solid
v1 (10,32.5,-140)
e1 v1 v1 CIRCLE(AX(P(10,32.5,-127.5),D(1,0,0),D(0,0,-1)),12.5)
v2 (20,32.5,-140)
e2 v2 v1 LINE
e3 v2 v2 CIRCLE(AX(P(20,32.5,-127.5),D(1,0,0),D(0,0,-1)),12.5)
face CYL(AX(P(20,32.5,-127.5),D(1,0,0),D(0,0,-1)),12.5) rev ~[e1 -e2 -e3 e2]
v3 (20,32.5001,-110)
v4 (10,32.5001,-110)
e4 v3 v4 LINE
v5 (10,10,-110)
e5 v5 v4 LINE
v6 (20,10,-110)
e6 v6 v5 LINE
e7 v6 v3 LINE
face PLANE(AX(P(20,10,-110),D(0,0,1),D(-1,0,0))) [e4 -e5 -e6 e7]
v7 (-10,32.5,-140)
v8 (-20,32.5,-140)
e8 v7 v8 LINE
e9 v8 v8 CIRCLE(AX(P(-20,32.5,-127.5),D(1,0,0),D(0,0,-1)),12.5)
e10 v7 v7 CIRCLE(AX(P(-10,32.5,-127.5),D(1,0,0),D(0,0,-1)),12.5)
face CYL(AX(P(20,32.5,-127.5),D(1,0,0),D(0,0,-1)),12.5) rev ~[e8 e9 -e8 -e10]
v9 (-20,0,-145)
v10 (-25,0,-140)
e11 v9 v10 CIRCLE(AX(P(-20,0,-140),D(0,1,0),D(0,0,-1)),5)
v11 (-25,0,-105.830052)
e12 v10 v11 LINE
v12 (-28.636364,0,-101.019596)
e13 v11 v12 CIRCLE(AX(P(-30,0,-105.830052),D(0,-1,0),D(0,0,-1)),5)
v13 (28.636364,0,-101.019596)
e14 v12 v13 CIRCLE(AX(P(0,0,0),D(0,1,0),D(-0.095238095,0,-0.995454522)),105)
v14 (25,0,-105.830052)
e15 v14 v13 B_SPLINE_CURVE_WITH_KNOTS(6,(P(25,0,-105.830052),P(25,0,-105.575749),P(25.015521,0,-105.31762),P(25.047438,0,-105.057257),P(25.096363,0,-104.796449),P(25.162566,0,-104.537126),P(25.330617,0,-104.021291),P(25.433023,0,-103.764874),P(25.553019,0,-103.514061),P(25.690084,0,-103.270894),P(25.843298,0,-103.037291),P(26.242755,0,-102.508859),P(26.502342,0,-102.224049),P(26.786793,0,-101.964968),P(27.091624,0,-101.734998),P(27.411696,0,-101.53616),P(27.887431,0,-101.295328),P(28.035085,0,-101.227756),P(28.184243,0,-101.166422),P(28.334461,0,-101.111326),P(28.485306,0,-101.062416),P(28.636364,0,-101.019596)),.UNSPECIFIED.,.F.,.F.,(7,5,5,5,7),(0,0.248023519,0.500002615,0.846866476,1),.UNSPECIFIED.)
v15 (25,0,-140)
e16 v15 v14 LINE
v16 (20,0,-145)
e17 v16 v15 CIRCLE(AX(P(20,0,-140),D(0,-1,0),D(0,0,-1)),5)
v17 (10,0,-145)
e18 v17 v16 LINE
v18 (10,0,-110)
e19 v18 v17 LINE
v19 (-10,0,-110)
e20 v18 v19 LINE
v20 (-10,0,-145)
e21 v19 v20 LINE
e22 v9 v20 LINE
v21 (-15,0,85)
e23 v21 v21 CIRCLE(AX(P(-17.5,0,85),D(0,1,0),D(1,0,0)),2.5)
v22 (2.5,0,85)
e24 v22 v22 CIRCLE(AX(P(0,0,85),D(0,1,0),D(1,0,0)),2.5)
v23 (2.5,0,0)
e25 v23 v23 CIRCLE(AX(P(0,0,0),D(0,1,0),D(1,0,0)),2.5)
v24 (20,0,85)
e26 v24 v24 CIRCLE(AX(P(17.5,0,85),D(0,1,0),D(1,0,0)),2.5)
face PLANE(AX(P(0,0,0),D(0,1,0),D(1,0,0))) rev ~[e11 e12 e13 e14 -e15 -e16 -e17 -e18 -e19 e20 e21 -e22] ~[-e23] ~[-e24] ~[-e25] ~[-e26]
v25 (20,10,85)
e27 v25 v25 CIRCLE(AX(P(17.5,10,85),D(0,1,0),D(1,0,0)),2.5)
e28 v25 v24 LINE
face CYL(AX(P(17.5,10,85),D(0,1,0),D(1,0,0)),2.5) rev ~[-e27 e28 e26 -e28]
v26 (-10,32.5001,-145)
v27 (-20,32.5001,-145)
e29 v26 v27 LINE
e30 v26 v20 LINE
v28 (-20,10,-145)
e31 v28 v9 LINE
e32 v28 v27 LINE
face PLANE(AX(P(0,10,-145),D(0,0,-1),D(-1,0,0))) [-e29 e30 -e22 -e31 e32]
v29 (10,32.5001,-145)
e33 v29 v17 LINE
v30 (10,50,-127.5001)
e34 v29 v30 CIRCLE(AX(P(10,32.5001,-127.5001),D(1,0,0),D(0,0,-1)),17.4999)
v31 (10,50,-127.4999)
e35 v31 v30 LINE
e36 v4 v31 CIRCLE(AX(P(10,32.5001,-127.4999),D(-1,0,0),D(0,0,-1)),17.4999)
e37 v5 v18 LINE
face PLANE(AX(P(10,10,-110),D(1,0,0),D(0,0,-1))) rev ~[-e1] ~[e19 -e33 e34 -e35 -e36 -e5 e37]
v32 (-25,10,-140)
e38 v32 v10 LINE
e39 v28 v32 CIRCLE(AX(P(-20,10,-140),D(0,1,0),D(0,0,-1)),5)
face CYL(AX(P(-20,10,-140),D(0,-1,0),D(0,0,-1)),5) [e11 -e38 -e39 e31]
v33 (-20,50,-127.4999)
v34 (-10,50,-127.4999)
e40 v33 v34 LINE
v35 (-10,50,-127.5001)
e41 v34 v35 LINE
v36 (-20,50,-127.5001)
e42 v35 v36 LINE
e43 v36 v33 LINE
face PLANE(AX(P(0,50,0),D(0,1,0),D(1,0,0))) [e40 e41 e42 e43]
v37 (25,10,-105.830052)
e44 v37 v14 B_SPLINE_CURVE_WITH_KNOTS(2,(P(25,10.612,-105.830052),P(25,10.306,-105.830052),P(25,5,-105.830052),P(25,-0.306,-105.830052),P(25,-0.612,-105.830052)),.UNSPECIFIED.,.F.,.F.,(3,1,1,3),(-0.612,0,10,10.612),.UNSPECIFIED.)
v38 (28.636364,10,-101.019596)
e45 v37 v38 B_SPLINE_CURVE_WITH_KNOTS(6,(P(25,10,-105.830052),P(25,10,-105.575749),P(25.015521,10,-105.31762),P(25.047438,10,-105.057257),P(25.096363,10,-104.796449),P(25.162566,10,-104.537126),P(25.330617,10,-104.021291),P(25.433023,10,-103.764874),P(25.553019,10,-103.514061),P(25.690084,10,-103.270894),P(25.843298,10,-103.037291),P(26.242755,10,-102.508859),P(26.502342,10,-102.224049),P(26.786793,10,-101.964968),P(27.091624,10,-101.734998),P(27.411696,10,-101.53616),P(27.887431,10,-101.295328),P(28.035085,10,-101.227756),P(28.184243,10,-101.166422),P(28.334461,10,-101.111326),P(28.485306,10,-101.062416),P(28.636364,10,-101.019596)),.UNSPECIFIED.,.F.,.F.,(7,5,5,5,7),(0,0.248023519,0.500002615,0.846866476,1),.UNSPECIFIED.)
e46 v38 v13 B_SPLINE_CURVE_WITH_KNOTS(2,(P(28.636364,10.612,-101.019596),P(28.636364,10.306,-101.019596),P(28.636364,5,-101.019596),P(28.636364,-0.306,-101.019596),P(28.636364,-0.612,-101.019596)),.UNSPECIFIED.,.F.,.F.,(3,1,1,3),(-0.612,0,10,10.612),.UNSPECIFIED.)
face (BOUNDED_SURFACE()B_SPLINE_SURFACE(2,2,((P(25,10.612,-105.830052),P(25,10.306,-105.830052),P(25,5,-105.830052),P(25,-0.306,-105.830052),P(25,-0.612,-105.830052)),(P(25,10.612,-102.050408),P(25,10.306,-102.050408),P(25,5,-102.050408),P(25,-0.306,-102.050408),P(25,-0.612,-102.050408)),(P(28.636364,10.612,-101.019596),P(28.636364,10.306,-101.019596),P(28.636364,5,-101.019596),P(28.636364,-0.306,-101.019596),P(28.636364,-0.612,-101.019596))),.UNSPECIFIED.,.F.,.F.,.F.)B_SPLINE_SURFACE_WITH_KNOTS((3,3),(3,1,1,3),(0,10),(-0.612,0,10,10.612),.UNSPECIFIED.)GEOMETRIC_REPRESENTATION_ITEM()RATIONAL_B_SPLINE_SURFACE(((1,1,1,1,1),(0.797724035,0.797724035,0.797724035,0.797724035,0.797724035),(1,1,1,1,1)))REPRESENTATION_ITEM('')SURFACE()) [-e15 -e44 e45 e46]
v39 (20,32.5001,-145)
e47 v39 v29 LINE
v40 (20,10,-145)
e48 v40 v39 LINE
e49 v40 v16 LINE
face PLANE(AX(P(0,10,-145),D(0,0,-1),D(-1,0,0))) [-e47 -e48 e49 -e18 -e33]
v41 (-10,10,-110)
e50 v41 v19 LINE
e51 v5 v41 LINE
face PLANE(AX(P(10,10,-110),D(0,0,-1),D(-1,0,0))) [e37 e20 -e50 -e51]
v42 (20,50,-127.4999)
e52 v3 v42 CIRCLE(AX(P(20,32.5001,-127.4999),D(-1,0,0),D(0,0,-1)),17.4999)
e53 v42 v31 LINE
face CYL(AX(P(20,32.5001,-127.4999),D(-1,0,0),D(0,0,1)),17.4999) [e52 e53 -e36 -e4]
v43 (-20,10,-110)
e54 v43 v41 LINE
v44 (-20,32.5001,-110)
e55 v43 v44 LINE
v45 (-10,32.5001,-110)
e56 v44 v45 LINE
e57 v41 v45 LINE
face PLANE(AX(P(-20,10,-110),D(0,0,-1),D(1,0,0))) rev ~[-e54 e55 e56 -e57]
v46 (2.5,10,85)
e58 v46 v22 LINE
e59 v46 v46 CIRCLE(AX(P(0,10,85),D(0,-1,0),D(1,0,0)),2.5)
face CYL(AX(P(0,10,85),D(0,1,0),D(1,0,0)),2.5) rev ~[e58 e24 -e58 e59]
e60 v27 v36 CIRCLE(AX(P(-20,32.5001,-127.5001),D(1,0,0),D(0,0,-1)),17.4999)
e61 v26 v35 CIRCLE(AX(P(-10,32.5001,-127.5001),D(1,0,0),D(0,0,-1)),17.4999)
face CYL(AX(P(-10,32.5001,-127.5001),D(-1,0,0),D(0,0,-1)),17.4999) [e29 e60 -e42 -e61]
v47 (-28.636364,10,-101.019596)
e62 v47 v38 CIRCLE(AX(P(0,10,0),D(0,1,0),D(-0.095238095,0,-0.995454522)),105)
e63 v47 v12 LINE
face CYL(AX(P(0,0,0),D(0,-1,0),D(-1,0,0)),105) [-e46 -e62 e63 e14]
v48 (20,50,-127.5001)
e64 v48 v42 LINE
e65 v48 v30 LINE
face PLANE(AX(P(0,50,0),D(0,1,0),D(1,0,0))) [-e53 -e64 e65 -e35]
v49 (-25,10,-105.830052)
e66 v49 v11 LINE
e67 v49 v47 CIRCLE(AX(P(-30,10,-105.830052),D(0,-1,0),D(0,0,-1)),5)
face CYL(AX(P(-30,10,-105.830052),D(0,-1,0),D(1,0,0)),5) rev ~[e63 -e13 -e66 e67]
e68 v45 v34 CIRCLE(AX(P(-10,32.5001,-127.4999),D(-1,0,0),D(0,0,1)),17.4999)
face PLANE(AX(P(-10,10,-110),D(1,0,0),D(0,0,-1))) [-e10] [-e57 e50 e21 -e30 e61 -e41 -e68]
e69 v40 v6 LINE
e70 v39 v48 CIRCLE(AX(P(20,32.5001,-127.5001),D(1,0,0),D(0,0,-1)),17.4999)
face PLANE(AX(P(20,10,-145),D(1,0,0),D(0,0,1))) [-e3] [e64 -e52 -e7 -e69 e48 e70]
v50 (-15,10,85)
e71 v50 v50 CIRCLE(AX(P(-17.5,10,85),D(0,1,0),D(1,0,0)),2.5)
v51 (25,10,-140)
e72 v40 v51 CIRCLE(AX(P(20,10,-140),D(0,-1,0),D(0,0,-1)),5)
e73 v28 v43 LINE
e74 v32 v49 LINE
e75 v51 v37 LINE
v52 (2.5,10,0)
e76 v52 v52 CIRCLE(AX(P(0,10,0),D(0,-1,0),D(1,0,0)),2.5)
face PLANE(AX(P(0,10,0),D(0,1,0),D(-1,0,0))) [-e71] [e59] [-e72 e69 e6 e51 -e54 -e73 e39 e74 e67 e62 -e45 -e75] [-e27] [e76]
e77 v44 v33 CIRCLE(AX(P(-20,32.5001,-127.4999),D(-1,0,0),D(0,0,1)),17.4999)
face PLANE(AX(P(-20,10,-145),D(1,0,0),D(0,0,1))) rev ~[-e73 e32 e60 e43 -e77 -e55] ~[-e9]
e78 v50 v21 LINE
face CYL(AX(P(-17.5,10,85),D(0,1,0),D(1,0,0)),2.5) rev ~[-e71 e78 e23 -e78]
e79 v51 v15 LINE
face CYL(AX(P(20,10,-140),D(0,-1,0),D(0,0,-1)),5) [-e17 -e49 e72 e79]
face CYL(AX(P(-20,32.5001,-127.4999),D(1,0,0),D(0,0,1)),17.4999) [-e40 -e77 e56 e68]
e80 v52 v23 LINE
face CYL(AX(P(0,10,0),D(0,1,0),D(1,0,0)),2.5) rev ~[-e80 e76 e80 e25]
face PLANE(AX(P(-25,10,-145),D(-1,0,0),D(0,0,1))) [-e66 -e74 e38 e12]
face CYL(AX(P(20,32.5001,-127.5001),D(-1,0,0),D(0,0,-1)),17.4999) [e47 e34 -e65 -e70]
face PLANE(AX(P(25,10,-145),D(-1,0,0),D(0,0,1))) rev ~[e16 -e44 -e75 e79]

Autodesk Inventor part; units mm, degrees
ref_plane "YZ Plane" through (0, 0, 0) normal (1, 0, 0) x (0, 1, 0)
ref_plane "XZ Plane" through (0, 0, 0) normal (0, 1, 0) x (-1, 0, 0)
ref_plane "XY Plane" through (0, 0, 0) normal (0, 0, 1) x (1, 0, 0)
sketch "Sketch1" plane through (0, 0, 0) normal (0, 1, 0) x (-1, 0, 0)
  circle A0 centre (0, 0) radius 105
  dimension "d0" = 210
extrude "Extrusion1" add sketch "Sketch1" along normal blind 10
sketch "Sketch2" plane through (0, 10, 0) normal (0, 1, 0) x (1, 0, 0)
  line L0 (-79.8594, -68.6516) -> (79.5179, -68.6516)
  line L1 (0, 0) -> (0, -80)
  line L2 (0, -80) -> (0, -60)
  line L3 (0, -60) -> (17.5, -60)
  line L4 (0, -60) -> (-17.5, -60)
  circle A0 centre (-17.5, -60) radius 2.5
  circle A1 centre (0, -60) radius 2.5
  circle A2 centre (17.5, -60) radius 2.5
  dimension "d4" = 80
  dimension "d5" = 20
  dimension "d6" = 17.5
  dimension "d7" = 17.5
  dimension "d8" = 5
  dimension "d9" = 5
  dimension "d10" = 5
extrude "Extrusion2" cut sketch "Sketch2" against normal blind 10
sketch "Sketch3" plane through (0, 10, 0) normal (0, 1, 0) x (1, 0, 0)
  circle A0 centre (0, 0) radius 2.5
  dimension "d13" = 5
extrude "Extrusion3" cut sketch "Sketch3" against normal blind 10
sketch "Sketch4" plane through (0, 10, 0) normal (0, 1, 0) x (1, 0, 0)
  circle A0 centre (0, 0) radius 2.5 projected
  line L0 (0, 0) -> (0, 80)
  line L1 (-15, 80) -> (-15, 65)
  line L2 (-15, 65) -> (15, 65)
  line L3 (15, 65) -> (15, 95)
  line L4 (15, 95) -> (-15, 95)
  line L5 (-15, 95) -> (-15, 80)
  line L6 (0, 80) -> (-7.5, 80)
  line L7 (-7.5, 80) -> (7.5, 80)
  line L8 (7.5, 80) -> (7.5, 95)
  line L9 (7.5, 80) -> (7.5, 65)
  line L10 (-7.5, 80) -> (-7.5, 95)
  line L11 (-7.5, 80) -> (-7.5, 65)
  dimension "d20" = 15
  dimension "d21" = 15
  dimension "d22" = 30
  dimension "d23" = 30
  dimension "d24" = 7.5
  dimension "d25" = 15
extrude "Extrusion4" add sketch "Sketch4" along normal blind 30 contours L2 L11 L6 L0 | L0 L7 L9 L2 | L6 L10 L4 L8 L7
sketch "Sketch5" plane through (7.5, 10, -65) normal (1, 0, 0) x (0, 0, -1)
  line L0 (40, 0) -> (-170, 0) projected
  line L1 (40, 0) -> (15, 0)
  line L2 (15, 0) -> (15, 15)
  circle A0 centre (15, 15) radius 7.5
  line L3 (30, 0) -> (30, 30) projected
  arc A1 (30, 15) -> (0, 15) centre (15, 15) ccw
  line L4 (15, 15) -> (0, 15) construction
  line L5 (15, 15) -> (30, 15) construction
  line L6 (0, 0) -> (0, 30) projected
  line L7 (0, 15) -> (0, 30)
  line L8 (0, 30) -> (30, 30) projected
  line L9 (0, 30) -> (30, 30)
  line L10 (30, 30) -> (30, 15)
  point P0 (-65, -10)
  point P1 (15, 30)
  dimension "d28" = 25
  dimension "d29" = 15
  dimension "d30" = 15
  dimension "d31" = 180
extrude "Extrusion5" cut sketch "Sketch5" against normal blind 30 contours A1 L8 L3 | A1 L6 L8 | A0
sketch "Sketch6" plane through (7.5, 10, -65) normal (1, 0, 0) x (0, 0, -1)
  circle A0 centre (15, 15) radius 7.5 projected
  circle A1 centre (15, 15) radius 5
  circle A2 centre (15, 15) radius 7.5
  point P0 (-65, -10)
  dimension "d34" = 10
extrude "Extrusion6" add sketch "Sketch6" against normal blind 15
sketch "Sketch7" plane through (7.5, 10, -65) normal (1, 0, 0) x (0, 0, -1)
  line L0 (0, 0) -> (30, 0) projected
  line L1 (0, 0) -> (30, 0)
  line L2 (30, 0) -> (30, 34.6991)
  line L3 (30, 34.6991) -> (0, 34.6991)
  line L4 (0, 34.6991) -> (0, 0)
  point P0 (-65, -10)
extrude "Extrusion7" cut sketch "Sketch7" against normal blind 15
sketch "Sketch8" plane through (0, 10, 0) normal (0, 1, 0) x (1, 0, 0)
  circle A0 centre (0, 0) radius 2.5 projected
  line L0 (0, 0) -> (0, 100)
  line L1 (0, 100) -> (-10, 100)
  line L2 (-10, 100) -> (-20, 100)
  line L3 (-20, 100) -> (-20, 65)
  line L4 (-20, 65) -> (-10, 65)
  line L5 (-10, 65) -> (-10, 100)
  line L6 (0, 100) -> (10, 100)
  line L7 (10, 100) -> (20, 100)
  line L8 (20, 100) -> (20, 65)
  line L9 (20, 65) -> (10, 65)
  line L10 (10, 65) -> (10, 100)
  dimension "d42" = 100
  dimension "d43" = 10
  dimension "d44" = 10
  dimension "d45" = 35
  dimension "d46" = 10
  dimension "d47" = 10
  dimension "d48" = 35
extrude "Extrusion8" add sketch "Sketch8" along normal blind 35 contours L5 L4 L3 L2 | L7 L8 L9 L10
thicken "Thicken1" operation add thickness 5 both sides no extend neighbours yes toward (0, 1, 0) faces at (13.3333, 45, -88.3333)
thicken "Thicken2" operation add thickness 5 both sides no extend neighbours yes toward (0, 1, 0) faces at (-16.6667, 45, -88.3333)
sketch "Sketch10" plane through (20, 10, -65) normal (1, 0, 0) x (0, 0, -1)
  line L0 (0, 0) -> (35, 0) projected
  line L1 (0, 0) -> (17.5, 0)
  line L2 (17.5, 0) -> (17.5, 22.5)
  circle A0 centre (17.5, 22.5) radius 12.5
  circle A1 centre (17.5, 22.5) radius 17.5
  line L3 (35, 0) -> (35, 40) projected
  line L4 (0, 0) -> (0, 40) projected
  line L5 (0, 22.5) -> (0, 40)
  line L6 (35, 40) -> (0, 40) projected
  line L7 (0, 40) -> (35, 40)
  line L8 (35, 40) -> (35, 22.5)
  point P0 (-65, -10)
  point P1 (17.5, 40)
  dimension "d60" = 22.5
  dimension "d61" = 25
extrude "Extrusion9" cut sketch "Sketch10" against normal blind 40 contours L4 L6 A1 | L6 L3 A1 | A0
sketch "Sketch11" plane through (20, 10, -65) normal (1, 0, 0) x (0, 0, -1)
  line L0 (40, 0) -> (-170, 0) projected
  line L1 (35.2175, 0) -> (0.2175, 0)
  line L2 (0.2175, 0) -> (-34.7825, 0)
  line L3 (0.2175, 0) -> (40.2175, 0)
  circle A0 centre (40.2175, 17.5) radius 12.5
  circle A1 centre (40.2175, 17.5) radius 17.5
  line L4 (-34.7825, 0) -> (32.4725, 33.1928)
  point P0 (-65, -10)
  dimension "d73" = 35
  dimension "d74" = 35
  dimension "d75" = 40
  dimension "d78" = 35
sketch "Sketch12" plane through (-20, 10, -100) normal (-1, 0, 0) x (0, 0, 1)
  line L0 (205, 0) -> (-5, 0) projected
  line L1 (37.401, 0) -> (37.401, 45.2729)
  line L2 (37.401, 45.2729) -> (-3.1543, 48.8051)
  line L3 (-3.1543, 48.8051) -> (-3.1543, 0)
  line L4 (37.401, 0) -> (-3.1543, 0)
  point P0 (100, -10)
extrude "Extrusion10" cut sketch "Sketch12" against normal blind 40
extrude "Extrusion11" add sketch "Sketch11" against normal blind 40
sketch "Sketch13" plane through (0, 0, 0) normal (0, 0, 1) x (1, 0, 0)
  line L0 (105, 10) -> (-105, 10) projected
  line L1 (0, 10) -> (10, 10)
  line L2 (10, 10) -> (10, 48.8421)
  line L3 (20, 43.1928) -> (-20, 43.1928) projected
  line L4 (10, 48.8421) -> (-10, 48.8421)
  line L5 (-10, 48.8421) -> (-10, 10)
  line L6 (-10, 10) -> (10, 10)
  point P0 (0, 0)
  point P1 (-20, 10)
  point P2 (20, 10)
  dimension "d83" = 10
  dimension "d84" = 20
extrude "Extrusion12" cut sketch "Sketch13" against normal blind 150
sketch "Sketch14" plane through (20, 10, -65) normal (1, 0, 0) x (0, 0, -1)
  line L0 (38.0776, 0) -> (-34.7825, 0) projected
  line L1 (-34.7825, 0) -> (42.8397, 49.7383)
  line L2 (42.8397, 49.7383) -> (77.8644, 0)
  line L3 (77.8644, 0) -> (-34.7825, 0)
  point P0 (-65, -10)
extrude "Extrusion13" cut sketch "Sketch14" against normal blind 150
sketch "Sketch15" plane through (0, 10, 0) normal (0, 1, 0) x (1, 0, 0)
  circle A0 centre (0, 0) radius 2.5 projected
  line L0 (0, 0) -> (0, 100)
  line L1 (0, 100) -> (-20, 100)
  line L2 (-20, 100) -> (-20, 65)
  line L3 (-20, 65) -> (-10, 65)
  line L4 (-10, 65) -> (-10, 100)
  line L5 (-10, 65) -> (10, 65)
  line L6 (10, 65) -> (20, 65)
  line L7 (20, 65) -> (20, 100)
  line L8 (20, 100) -> (10, 100)
  line L9 (10, 100) -> (10, 65)
  dimension "d89" = 100
  dimension "d90" = 20
  dimension "d91" = 35
  dimension "d92" = 10
  dimension "d93" = 20
  dimension "d94" = 10
  dimension "d95" = 35
  dimension "d96" = 10
extrude "Extrusion14" add sketch "Sketch15" along normal blind 40 contours L3 L2 L1 L4 | L9 L8 L7 L6
sketch "Sketch16" plane through (20, 10, -65) normal (1, 0, 0) x (0, 0, -1)
  line L0 (0, 40) -> (35, 40) projected
  line L1 (17.5, 40) -> (17.5, 22.5)
  circle A0 centre (17.5, 22.5) radius 12.5
  circle A1 centre (17.5, 22.5) radius 17.5
  line L2 (35, 0) -> (35, 40) projected
  line L3 (0, 0) -> (0, 40) projected
  line L4 (0, 22.5) -> (0, 40)
  line L5 (0, 40) -> (35, 40)
  line L6 (35, 40) -> (35, 22.5)
  point P0 (-65, -10)
  dimension "d99" = 17.5
  dimension "d100" = 25
extrude "Extrusion15" cut sketch "Sketch16" against normal blind 40 contours L0 A1 L3 | L0 L2 A1 | A0
sketch "Sketch18" plane through (0, 10, 0) normal (0, 1, 0) x (1, 0, 0)
  line L0 (-10, 65) -> (-20, 65) projected
  line L1 (10, 65) -> (10, 100) projected
  line L2 (-10, 65) -> (10, 65)
  line L3 (10, 65) -> (10, 111.2793)
  line L4 (10, 111.2793) -> (-10, 111.2793)
  line L5 (-10, 100) -> (-10, 65) projected
  line L6 (-10, 111.2793) -> (-10, 65)
  point P0 (0, 0)
extrude "Extrusion17" cut sketch "Sketch18" against normal blind 40
sketch "Sketch19" plane through (0, 10, 0) normal (0, 1, 0) x (1, 0, 0)
  circle A0 centre (0, 0) radius 2.5 projected
  line L0 (0, 0) -> (0, -85)
  circle A1 centre (0, -85) radius 2.5
  circle A2 centre (17.5, -85) radius 2.5
  circle A3 centre (-17.5, -85) radius 2.5
  dimension "d119" = 85
  dimension "d120" = 5
  dimension "d121" = 5
  dimension "d122" = 5
extrude "Extrusion18" cut sketch "Sketch19" against normal blind 10 contours A1 | A2 | A3
sketch "Sketch20" plane through (0, 10, 0) normal (0, 1, 0) x (1, 0, 0)
  circle A0 centre (0, -60.0339) radius 2.5
  circle A1 centre (17.5, -60) radius 2.5 projected
  circle A2 centre (17.5, -60) radius 2.5
  circle A3 centre (-17.5, -60) radius 2.5 projected
  circle A4 centre (-17.5, -60) radius 2.5
  point P0 (0, 0)
  dimension "d125" = 5
  dimension "d126" = 5
  dimension "d127" = 5
extrude "Extrusion19" add sketch "Sketch20" against normal blind 10
sketch "Sketch21" plane through (0, 10, 0) normal (0, 1, 0) x (1, 0, 0)
  circle A0 centre (0, -62.5) radius 12.6485
  point P0 (0, 0)
extrude "Extrusion20" add sketch "Sketch21" against normal blind 10
sketch "Sketch28" plane through (0, 10, 0) normal (0, 1, 0) x (1, 0, 0)
  line L0 (0, 0) -> (0, 145)
  line L1 (0, 145) -> (-25, 145)
  line L2 (-25, 145) -> (-25, 58.6582)
  line L3 (-25, 58.6582) -> (25.7597, 58.6582)
  line L4 (25.7597, 58.6582) -> (25.7597, 145)
  line L5 (25.7597, 145) -> (0, 145)
  dimension "d165" = 145
  dimension "d166" = 25
extrude "Extrusion27" add sketch "Sketch28" against normal blind 10
sketch "Sketch29" plane through (0, 10, 0) normal (0, 1, 0) x (1, 0, 0)
  line L0 (0, 56.8176) -> (-28.7063, 61.8747)
  line L1 (-28.7063, 61.8747) -> (-21.0018, 105.6086)
  line L2 (-21.0018, 105.6086) -> (22.7568, 105.6086)
  line L3 (22.7568, 105.6086) -> (27.8138, 56.8176)
  line L4 (27.8138, 56.8176) -> (0, 56.8176)
  point P0 (0, 0)
extrude "Extrusion28" cut sketch "Sketch29" along normal blind 40
sketch "Sketch30" plane through (0, 10, 0) normal (0, 1, 0) x (1, 0, 0)
  line L0 (25.7597, 145) -> (-25, 145) projected
  line L1 (-25, 145) -> (-10, 145)
  line L2 (-10, 145) -> (10, 145)
  line L3 (0, 145) -> (-10, 145)
  line L4 (-10, 145) -> (-20, 145)
  line L5 (-20, 145) -> (-20, 110)
  line L6 (-20, 110) -> (-10, 110)
  line L7 (-10, 110) -> (-10, 145)
  line L8 (0, 145) -> (10, 145)
  line L9 (10, 145) -> (20, 145)
  line L10 (20, 145) -> (20, 110)
  line L11 (20, 110) -> (10, 110)
  line L12 (10, 110) -> (10, 145)
  point P0 (0, 0)
  dimension "d173" = 10
  dimension "d174" = 10
  dimension "d175" = 35
  dimension "d176" = 10
  dimension "d177" = 10
  dimension "d178" = 10
extrude "Extrusion29" add sketch "Sketch30" along normal blind 40
fillet "Fillet4" radius 17.5 4 edges at (15, 50, -145) (15, 50, -110) (-15, 50, -110) (-15, 50, -145)
sketch "Sketch31" plane through (0, 10, 0) normal (0, 1, 0) x (1, 0, 0)
  line L0 (-25, 145) -> (25.7597, 145) projected
  line L1 (0, 145) -> (-25, 145)
  line L2 (0, 145) -> (25, 145)
  circle A0 centre (0, 0) radius 2.5 projected
  circle A1 centre (0, 0) radius 105
  line L3 (25, 145) -> (25, 101.9804)
  line L4 (25, 145) -> (25.7597, 145)
  line L5 (25.7597, 145) -> (25.7597, 101.7911)
  dimension "d182" = 25
  dimension "d183" = 25
  dimension "d184" = 210
extrude "Extrusion30" cut sketch "Sketch31" against normal blind 40 contours L0 L5 A1 L3
sketch "Sketch32" plane through (20, 10, -110) normal (1, 0, 0) x (0, 0, -1)
  arc A0 (35, 22.5) -> (0, 22.5) centre (17.5, 22.5) ccw projected
  circle A1 centre (17.5, 22.5) radius 12.5
  point P0 (-110, -10)
  dimension "d187" = 25
extrude "Extrusion31" cut sketch "Sketch32" against normal blind 40
fillet "Fillet5" radius 5 4 edges at (25, 5, -145) (25, 5, -101.9804) (-25, 5, -145) (-25, 5, -101.9804)
sketch "Sketch33" plane through (0, 10, 0) normal (0, 1, 0) x (1, 0, 0)
  line L0 (10, 110) -> (20, 110) projected
  line L1 (10, 110) -> (-10, 110)
  line L2 (-10, 110) -> (-10, 145)
  line L3 (-10, 145) -> (10, 145)
  line L4 (10, 110) -> (10, 145) projected
  line L5 (10, 145) -> (10, 110)
  point P0 (0, 0)
  dimension "d191" = 20
  dimension "d192" = 35
extrude "Extrusion32" cut sketch "Sketch33" against normal blind 40
properties part number "Base do telescópio"
